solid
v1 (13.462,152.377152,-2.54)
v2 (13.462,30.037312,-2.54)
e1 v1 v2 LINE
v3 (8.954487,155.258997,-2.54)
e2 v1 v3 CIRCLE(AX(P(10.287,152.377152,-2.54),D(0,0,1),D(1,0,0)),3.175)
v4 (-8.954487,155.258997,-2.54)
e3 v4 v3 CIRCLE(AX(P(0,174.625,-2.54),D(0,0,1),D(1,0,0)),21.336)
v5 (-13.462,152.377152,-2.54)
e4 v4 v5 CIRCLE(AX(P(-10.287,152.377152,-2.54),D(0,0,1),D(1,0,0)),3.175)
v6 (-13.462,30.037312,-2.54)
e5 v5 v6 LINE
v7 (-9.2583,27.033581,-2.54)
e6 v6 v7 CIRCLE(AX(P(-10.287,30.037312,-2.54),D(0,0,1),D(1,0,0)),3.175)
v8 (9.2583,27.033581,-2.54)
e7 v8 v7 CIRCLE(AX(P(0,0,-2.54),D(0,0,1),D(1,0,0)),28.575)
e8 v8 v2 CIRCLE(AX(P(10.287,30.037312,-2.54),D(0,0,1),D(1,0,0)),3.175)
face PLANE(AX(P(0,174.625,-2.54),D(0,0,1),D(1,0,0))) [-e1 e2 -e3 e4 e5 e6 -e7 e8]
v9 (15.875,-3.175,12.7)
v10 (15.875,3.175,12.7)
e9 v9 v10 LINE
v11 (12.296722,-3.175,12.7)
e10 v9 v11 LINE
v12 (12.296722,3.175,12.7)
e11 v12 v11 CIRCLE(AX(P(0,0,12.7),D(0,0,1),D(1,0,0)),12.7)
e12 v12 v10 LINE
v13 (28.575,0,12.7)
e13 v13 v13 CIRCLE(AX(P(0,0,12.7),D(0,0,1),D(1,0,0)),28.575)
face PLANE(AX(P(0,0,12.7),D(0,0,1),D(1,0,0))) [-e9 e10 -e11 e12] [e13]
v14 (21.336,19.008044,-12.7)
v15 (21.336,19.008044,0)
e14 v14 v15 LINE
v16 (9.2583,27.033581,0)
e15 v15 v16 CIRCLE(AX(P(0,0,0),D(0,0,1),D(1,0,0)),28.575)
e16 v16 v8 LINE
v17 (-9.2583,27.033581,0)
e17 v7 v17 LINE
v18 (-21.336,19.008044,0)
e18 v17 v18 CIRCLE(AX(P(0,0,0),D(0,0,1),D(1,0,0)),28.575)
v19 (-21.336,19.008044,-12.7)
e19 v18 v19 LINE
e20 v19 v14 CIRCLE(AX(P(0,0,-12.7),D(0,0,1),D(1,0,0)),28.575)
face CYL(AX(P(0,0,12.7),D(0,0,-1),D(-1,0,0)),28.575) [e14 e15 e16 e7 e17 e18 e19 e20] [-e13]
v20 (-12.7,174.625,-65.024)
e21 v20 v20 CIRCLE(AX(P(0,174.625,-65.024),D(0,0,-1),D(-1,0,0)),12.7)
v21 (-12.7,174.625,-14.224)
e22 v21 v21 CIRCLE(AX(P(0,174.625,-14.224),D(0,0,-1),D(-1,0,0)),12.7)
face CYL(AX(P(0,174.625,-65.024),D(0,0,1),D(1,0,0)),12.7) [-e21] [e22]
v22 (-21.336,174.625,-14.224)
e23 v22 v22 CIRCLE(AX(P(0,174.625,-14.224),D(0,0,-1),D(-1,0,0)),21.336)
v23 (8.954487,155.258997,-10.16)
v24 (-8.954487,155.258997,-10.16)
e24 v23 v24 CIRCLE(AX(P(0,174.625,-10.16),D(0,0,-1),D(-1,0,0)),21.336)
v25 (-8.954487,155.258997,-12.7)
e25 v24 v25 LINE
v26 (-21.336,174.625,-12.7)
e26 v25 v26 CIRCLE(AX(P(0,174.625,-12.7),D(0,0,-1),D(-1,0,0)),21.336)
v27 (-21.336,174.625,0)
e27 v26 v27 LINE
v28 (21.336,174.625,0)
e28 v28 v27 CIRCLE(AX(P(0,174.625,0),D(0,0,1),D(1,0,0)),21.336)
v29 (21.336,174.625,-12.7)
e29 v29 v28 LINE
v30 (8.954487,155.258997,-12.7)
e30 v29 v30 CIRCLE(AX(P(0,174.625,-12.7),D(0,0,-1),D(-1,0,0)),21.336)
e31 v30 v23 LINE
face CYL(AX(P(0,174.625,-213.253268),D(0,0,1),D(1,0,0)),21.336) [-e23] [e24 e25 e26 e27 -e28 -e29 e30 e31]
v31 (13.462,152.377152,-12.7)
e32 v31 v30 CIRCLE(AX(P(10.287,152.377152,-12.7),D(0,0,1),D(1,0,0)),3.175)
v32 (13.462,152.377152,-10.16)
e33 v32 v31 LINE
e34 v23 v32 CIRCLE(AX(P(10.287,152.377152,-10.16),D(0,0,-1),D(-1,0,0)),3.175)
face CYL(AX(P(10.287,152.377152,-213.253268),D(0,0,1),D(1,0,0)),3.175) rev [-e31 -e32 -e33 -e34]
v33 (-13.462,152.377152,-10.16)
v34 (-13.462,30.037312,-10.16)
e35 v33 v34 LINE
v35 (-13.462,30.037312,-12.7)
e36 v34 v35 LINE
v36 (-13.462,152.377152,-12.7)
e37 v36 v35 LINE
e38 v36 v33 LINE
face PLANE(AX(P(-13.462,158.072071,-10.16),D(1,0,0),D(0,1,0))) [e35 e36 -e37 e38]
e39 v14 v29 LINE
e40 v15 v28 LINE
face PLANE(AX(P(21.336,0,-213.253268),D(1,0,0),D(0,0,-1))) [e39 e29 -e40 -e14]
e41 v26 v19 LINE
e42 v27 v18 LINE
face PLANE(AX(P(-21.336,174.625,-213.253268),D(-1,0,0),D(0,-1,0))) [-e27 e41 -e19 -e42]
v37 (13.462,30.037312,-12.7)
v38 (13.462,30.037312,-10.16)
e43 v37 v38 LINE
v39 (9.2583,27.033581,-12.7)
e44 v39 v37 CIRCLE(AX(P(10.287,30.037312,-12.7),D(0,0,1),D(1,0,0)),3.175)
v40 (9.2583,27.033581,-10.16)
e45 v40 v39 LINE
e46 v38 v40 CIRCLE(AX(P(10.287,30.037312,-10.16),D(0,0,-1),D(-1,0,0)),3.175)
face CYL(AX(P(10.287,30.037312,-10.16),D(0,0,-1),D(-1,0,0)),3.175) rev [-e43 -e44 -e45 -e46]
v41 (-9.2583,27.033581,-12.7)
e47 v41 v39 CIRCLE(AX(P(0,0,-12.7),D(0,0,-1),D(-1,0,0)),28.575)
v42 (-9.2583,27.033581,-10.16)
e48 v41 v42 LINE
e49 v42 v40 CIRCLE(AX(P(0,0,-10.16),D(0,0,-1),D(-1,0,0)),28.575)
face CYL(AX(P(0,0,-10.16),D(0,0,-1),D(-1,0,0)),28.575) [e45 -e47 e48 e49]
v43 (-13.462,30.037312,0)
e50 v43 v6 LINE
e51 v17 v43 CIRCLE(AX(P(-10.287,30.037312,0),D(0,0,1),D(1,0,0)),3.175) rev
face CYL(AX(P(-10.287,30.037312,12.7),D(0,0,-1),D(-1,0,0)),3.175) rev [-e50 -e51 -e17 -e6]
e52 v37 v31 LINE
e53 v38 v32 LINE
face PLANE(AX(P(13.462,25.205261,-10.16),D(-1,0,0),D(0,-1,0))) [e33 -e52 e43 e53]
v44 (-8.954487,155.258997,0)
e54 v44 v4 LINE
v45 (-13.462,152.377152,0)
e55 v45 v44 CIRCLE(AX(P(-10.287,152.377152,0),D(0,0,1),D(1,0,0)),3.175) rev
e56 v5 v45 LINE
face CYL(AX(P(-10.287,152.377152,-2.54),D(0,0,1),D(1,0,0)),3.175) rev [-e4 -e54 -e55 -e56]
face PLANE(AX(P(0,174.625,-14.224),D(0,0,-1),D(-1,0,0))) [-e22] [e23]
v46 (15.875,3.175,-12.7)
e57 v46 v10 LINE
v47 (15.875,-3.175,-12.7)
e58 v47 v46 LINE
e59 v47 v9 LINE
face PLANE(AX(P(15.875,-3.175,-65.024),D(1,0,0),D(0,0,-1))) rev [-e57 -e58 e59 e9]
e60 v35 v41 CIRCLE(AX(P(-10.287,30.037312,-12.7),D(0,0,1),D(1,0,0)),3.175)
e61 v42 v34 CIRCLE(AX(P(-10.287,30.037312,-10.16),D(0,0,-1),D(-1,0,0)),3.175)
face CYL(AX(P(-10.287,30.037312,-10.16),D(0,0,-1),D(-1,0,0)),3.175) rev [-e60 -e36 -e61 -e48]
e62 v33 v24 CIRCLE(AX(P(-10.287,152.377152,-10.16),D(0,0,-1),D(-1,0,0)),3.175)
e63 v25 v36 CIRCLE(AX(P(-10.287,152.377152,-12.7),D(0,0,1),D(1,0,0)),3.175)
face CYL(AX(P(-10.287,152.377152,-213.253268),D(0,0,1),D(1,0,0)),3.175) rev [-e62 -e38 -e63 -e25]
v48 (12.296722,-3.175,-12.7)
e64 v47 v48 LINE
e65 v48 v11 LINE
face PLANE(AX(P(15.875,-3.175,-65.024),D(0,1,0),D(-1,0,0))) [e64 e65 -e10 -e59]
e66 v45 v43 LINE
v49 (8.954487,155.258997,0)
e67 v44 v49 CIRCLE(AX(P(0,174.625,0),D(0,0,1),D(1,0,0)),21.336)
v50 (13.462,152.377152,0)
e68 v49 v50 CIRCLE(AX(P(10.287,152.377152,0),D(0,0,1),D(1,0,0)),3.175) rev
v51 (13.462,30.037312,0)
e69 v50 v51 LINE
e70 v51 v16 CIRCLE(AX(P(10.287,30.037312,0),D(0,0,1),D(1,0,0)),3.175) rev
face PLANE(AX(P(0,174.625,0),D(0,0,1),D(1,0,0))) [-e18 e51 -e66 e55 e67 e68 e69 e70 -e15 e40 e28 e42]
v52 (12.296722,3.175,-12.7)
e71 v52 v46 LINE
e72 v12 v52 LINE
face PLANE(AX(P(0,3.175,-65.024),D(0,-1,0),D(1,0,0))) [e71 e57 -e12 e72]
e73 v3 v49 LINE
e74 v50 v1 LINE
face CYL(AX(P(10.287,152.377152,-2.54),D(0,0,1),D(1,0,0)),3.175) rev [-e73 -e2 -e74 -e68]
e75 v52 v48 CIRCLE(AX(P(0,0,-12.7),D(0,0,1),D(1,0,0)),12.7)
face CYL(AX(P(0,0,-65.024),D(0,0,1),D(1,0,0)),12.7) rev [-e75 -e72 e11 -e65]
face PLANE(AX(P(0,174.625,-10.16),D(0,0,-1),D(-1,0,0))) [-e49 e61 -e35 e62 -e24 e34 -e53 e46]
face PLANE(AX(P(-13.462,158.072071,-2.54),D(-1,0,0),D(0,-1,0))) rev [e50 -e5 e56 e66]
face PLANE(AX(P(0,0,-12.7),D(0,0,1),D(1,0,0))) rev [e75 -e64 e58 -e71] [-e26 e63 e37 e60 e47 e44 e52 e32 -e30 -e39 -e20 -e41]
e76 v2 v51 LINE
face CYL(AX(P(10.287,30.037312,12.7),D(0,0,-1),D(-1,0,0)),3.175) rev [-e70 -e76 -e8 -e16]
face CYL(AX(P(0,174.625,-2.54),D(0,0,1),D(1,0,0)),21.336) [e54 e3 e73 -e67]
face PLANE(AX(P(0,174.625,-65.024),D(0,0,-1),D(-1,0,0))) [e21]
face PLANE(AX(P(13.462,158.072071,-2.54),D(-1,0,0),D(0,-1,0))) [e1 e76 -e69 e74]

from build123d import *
from build123d.topology import SkipClean

# Parameters (mm, degrees)
SKETCH1_R            = 28.574999999999996
BASE_PIVOT_DEPTH     = 12.7
SHAFT_START          = -12.7
SHAFT_DEPTH          = 12.7
TOP_START            = 1.524
SKETCH3_R            = 21.335999999999974
TOP_SHELF_DEPTH      = 1.524
SKETCH4_R            = 12.699999999999998
TOP_PIN_DEPTH        = 50.8
FRONT_START          = -2.54
FRONT_RECESS_DEPTH   = 2.54
BACK_RECESS_DEPTH    = 2.54
BASE_HOLE_DEPTH      = 209.43551693989195
BASE_HOLE_DEPTH_BACK = 209.43551693989195
SKETCH7_R            = 12.7
KEY_WAY_DEPTH        = 209.43551693989195
KEY_WAY_DEPTH_BACK   = 209.43551693989195
FILLET1_R            = 3.175


with BuildPart() as part:
    # Sketch1 → Base pivot (new, symmetric)
    with BuildSketch(Plane.XY):
        Circle(SKETCH1_R)
    extrude(amount=BASE_PIVOT_DEPTH, both=True)

    # Sketch2 → Shaft (add)
    with BuildSketch(Plane.XY.offset(SHAFT_START)):
        with BuildLine():
            Line((-21.335999999999938, 174.625), (-21.336000000000002, 7.84e-15))
            Line((-21.336000000000002, 7.84e-15), (21.336000000000002, 0))
            Line((21.336000000000002, 0), (21.336000000000002, 174.625))
            ThreePointArc((21.336000000000002, 174.625), (3.338e-14, 195.96099999999996), (-21.335999999999938, 174.625))
        make_face()
    extrude(amount=SHAFT_DEPTH)

    # Sketch3 → Top shelf (add)
    with SkipClean():  # the faces are left unmerged after this step: merging them gives an invalid solid
        with BuildSketch(Plane(origin=(0, 0, -12.7), x_dir=(-1, 0, 0), z_dir=(0, 0, -1)).offset(TOP_START)):
            with Locations((-3.208e-14, 174.625)):
                Circle(SKETCH3_R)
        extrude(amount=-TOP_SHELF_DEPTH)

    # Sketch4 → Top pin (add)
    with SkipClean():  # the faces are left unmerged after this step: merging them gives an invalid solid
        with BuildSketch(Plane(origin=(0, 0, -14.223999999999998), x_dir=(-1, 0, 0), z_dir=(0, 0, -1))):
            with Locations((-3.208e-14, 174.625)):
                Circle(SKETCH4_R)
        extrude(amount=TOP_PIN_DEPTH)

    # Sketch5 → Front recess (cut)
    with SkipClean():  # the faces are left unmerged after this step: merging them gives an invalid solid
        with BuildSketch(Plane.XY.offset(FRONT_START)):
            with BuildLine():
                Line((-13.461999999999927, 158.07207119570683), (-13.461999999999975, 25.20526097861318))
                ThreePointArc((-13.461999999999975, 25.20526097861318), (1.75e-15, 28.574999999999992), (13.461999999999987, 25.205260978613172))
                Line((13.461999999999987, 25.205260978613172), (13.462000000000003, 158.07207119570683))
                ThreePointArc((13.462000000000003, 158.07207119570683), (3.812e-14, 153.28900000000004), (-13.461999999999927, 158.07207119570683))
            make_face()
        extrude(amount=FRONT_RECESS_DEPTH, mode=Mode.SUBTRACT)

    # Sketch6 → Back recess (cut)
    with SkipClean():  # the faces are left unmerged after this step: merging them gives an invalid solid
        with BuildSketch(Plane(origin=(0, 0, -12.7), x_dir=(-1, 0, 0), z_dir=(0, 0, -1))):
            with BuildLine():
                Line((13.461999999999929, 158.07207119570683), (13.461999999999975, 25.20526097861318))
                ThreePointArc((13.461999999999975, 25.20526097861318), (-1.094e-14, 28.574999999999992), (-13.461999999999987, 25.205260978613172))
                Line((-13.461999999999987, 25.205260978613172), (-13.461999999999998, 158.07207119570683))
                ThreePointArc((-13.461999999999998, 158.07207119570683), (-3.551e-14, 153.28900000000004), (13.461999999999929, 158.07207119570683))
            make_face()
        extrude(amount=-BACK_RECESS_DEPTH, mode=Mode.SUBTRACT)

    # Sketch7 → Base hole (cut, two sides: drawn at the far end of the back side and taken through both)
    with SkipClean():  # the faces are left unmerged after this step: merging them gives an invalid solid
        with BuildSketch(Plane.XY.offset(-BASE_HOLE_DEPTH_BACK)):
            Circle(SKETCH7_R)
        extrude(amount=BASE_HOLE_DEPTH + BASE_HOLE_DEPTH_BACK, mode=Mode.SUBTRACT)

    # Sketch8 → Key way (cut, two sides: drawn at the far end of the back side and taken through both)
    with SkipClean():  # the faces are left unmerged after this step: merging them gives an invalid solid
        with BuildSketch(Plane.XY.offset(-KEY_WAY_DEPTH_BACK)):
            Polygon((4e-16, 3.1750000000000003), (15.875, 3.174999999999997), (15.875, -3.1750000000000034), (-7.7e-16, -3.1750000000000003), align=None)
        extrude(amount=KEY_WAY_DEPTH + KEY_WAY_DEPTH_BACK, mode=Mode.SUBTRACT)

    # Fillet1
    # the kernel refuses this fillet: 3.175 mm, written as the material it adds along each edge
    with BuildSketch(Plane(origin=(-13.461999999999927, 158.07207119570683, -16.77729862803093), x_dir=(0.8483467712248999, -0.5294409842015325, 0), z_dir=(0, 0, 1))) as fillet1_piece_1_section:
        with BuildLine():
            CenterArc((5.70862475783739, -3.1502914039819587), FILLET1_R, 97.15273031823853, 114.81496184230716)
            Line((3.0151237591983637, -4.831266528821872), (0, 0))
            ThreePointArc((0, 0), (2.656645316666723, -0.16604176524117806), (5.313290633333425, -6e-17))
        make_face()
    fillet1_piece_1 = extrude(amount=16.77729862803093, mode=Mode.PRIVATE)
    fillet1_piece_1 = split(fillet1_piece_1, bisect_by=Plane(origin=(-12.378027921631585, 155.86897654595924, -12.7), z_dir=(0, 0, 1)), keep=Keep.TOP, mode=Mode.PRIVATE)
    add(fillet1_piece_1)
    with BuildSketch(Plane(origin=(13.462000000000003, 158.07207119570683, -16.777298628030998), x_dir=(0, -1, 0), z_dir=(0, 0, 1))) as fillet1_piece_2_section:
        with BuildLine():
            CenterArc((5.6949194512123995, -3.1750000000000007), FILLET1_R, 90, 114.81496184230605)
            ThreePointArc((2.813073822260918, -4.50751295336787), (1.5473979065612582, -2.1658471610760905), (0, 0))
            Line((0, 0), (5.6949194512123995, 0))
        make_face()
    fillet1_piece_2 = extrude(amount=16.777298628030998, mode=Mode.PRIVATE)
    fillet1_piece_2 = split(fillet1_piece_2, bisect_by=Plane(origin=(12.378027921631652, 155.86897654595924, -12.7), z_dir=(0, 0, 1)), keep=Keep.TOP, mode=Mode.PRIVATE)
    add(fillet1_piece_2)
    with BuildSketch(Plane(origin=(13.461999999999982, 25.205260978613172, -14.620128336437258), x_dir=(-0.9170202383773097, 0.39884067295904263, 0), z_dir=(0, 0, 1))) as fillet1_piece_3_section:
        with BuildLine():
            CenterArc((4.838757862902442, -3.1647697300383113), FILLET1_R, 94.60072202830712, 108.90500130287109)
            Line((1.9272186060544878, -4.431088866683278), (0, 0))
            ThreePointArc((0, 0), (2.2920431982169482, -0.0920724296552107), (4.584086396433892, 1.4e-16))
        make_face()
    fillet1_piece_3 = extrude(amount=14.620128336437258, mode=Mode.PRIVATE)
    fillet1_piece_3 = split(fillet1_piece_3, bisect_by=Plane(origin=(12.464896317702909, 26.864585865403097, -12.7), z_dir=(0, 0, 1)), keep=Keep.TOP, mode=Mode.PRIVATE)
    add(fillet1_piece_3)
    with BuildSketch(Plane(origin=(-13.461999999999975, 25.20526097861318, -14.620128336437222), x_dir=(0.9170202383773097, 0.3988406729590427, 0), z_dir=(0, 0, 1))) as fillet1_piece_4_section:
        with BuildLine():
            CenterArc((4.838757862902452, 3.164769730038311), FILLET1_R, 156.49427666882212, 108.90500130287074)
            Line((1.927218606054489, 4.431088866683262), (0, 0))
            ThreePointArc((0, 0), (2.292043198216952, 0.09207242965520915), (4.5840863964339, 1e-17))
        make_face()
    fillet1_piece_4 = extrude(amount=14.620128336437222, mode=Mode.PRIVATE)
    fillet1_piece_4 = split(fillet1_piece_4, bisect_by=Plane(origin=(-12.464896317702895, 26.864585865403104, -12.7), z_dir=(0, 0, 1)), keep=Keep.TOP, mode=Mode.PRIVATE)
    add(fillet1_piece_4)
    with BuildSketch(Plane(origin=(13.462, 158.07207119570683, -12.7), x_dir=(0, -1, 0), z_dir=(0, 0, 1))) as fillet1_piece_5_section:
        with BuildLine():
            CenterArc((5.6949194512123995, -3.1750000000000007), FILLET1_R, 90, 114.81496184230605)
            ThreePointArc((2.813073822260918, -4.50751295336787), (1.5473979065612582, -2.1658471610760905), (0, 0))
            Line((0, 0), (5.6949194512123995, 0))
        make_face()
    fillet1_piece_5 = extrude(amount=16.777298628031005, mode=Mode.PRIVATE)
    fillet1_piece_5 = split(fillet1_piece_5, bisect_by=Plane(origin=(12.378027921631652, 155.86897654595924, 0), z_dir=(0, 0, -1)), keep=Keep.TOP, mode=Mode.PRIVATE)
    add(fillet1_piece_5)
    with BuildSketch(Plane(origin=(-13.46199999999993, 158.07207119570683, -12.7), x_dir=(-3.1e-16, -1, 0), z_dir=(0, 0, 1))) as fillet1_piece_6_section:
        with BuildLine():
            CenterArc((5.6949194512124555, 3.1750000000000007), FILLET1_R, 155.18503815769455, 114.81496184230548)
            ThreePointArc((2.8130738222609453, 4.507512953367848), (1.5473979065612575, 2.1658471610760963), (0, 0))
            Line((0, 0), (5.694919451212456, 0))
        make_face()
    fillet1_piece_6 = extrude(amount=16.777298628031147, mode=Mode.PRIVATE)
    fillet1_piece_6 = split(fillet1_piece_6, bisect_by=Plane(origin=(-12.378027921631558, 155.86897654595919, 0), z_dir=(0, 0, -1)), keep=Keep.TOP, mode=Mode.PRIVATE)
    add(fillet1_piece_6)
    with BuildSketch(Plane(origin=(-13.461999999999975, 25.20526097861318, -12.7), x_dir=(0, 1, 0), z_dir=(0, 0, 1))) as fillet1_piece_7_section:
        with BuildLine():
            CenterArc((4.832051334574889, -3.1750000000000007), FILLET1_R, 90, 108.905001302871)
            ThreePointArc((1.8283201032560825, -4.203700000000001), (0.9985923330184399, -2.0651277701953425), (0, 0))
            Line((0, 0), (4.832051334574889, 0))
        make_face()
    fillet1_piece_7 = extrude(amount=14.620128336437226, mode=Mode.PRIVATE)
    fillet1_piece_7 = split(fillet1_piece_7, bisect_by=Plane(origin=(-12.4648963177029, 26.8645858654031, 0), z_dir=(0, 0, -1)), keep=Keep.TOP, mode=Mode.PRIVATE)
    add(fillet1_piece_7)
    with BuildSketch(Plane(origin=(13.46199999999999, 25.205260978613172, -12.7), x_dir=(-0.9170202383773102, 0.3988406729590419, 0), z_dir=(0, 0, 1))) as fillet1_piece_8_section:
        with BuildLine():
            CenterArc((4.838757862902448, -3.164769730038312), FILLET1_R, 94.60072202830708, 108.905001302871)
            Line((1.927218606054491, -4.4310888666832735), (0, 0))
            ThreePointArc((0, 0), (2.2920431982169456, -0.09207242965520608), (4.584086396433901, -1e-17))
        make_face()
    fillet1_piece_8 = extrude(amount=14.620128336437253, mode=Mode.PRIVATE)
    fillet1_piece_8 = split(fillet1_piece_8, bisect_by=Plane(origin=(12.464896317702909, 26.8645858654031, 0), z_dir=(0, 0, -1)), keep=Keep.TOP, mode=Mode.PRIVATE)
    add(fillet1_piece_8)


solid = part.part
